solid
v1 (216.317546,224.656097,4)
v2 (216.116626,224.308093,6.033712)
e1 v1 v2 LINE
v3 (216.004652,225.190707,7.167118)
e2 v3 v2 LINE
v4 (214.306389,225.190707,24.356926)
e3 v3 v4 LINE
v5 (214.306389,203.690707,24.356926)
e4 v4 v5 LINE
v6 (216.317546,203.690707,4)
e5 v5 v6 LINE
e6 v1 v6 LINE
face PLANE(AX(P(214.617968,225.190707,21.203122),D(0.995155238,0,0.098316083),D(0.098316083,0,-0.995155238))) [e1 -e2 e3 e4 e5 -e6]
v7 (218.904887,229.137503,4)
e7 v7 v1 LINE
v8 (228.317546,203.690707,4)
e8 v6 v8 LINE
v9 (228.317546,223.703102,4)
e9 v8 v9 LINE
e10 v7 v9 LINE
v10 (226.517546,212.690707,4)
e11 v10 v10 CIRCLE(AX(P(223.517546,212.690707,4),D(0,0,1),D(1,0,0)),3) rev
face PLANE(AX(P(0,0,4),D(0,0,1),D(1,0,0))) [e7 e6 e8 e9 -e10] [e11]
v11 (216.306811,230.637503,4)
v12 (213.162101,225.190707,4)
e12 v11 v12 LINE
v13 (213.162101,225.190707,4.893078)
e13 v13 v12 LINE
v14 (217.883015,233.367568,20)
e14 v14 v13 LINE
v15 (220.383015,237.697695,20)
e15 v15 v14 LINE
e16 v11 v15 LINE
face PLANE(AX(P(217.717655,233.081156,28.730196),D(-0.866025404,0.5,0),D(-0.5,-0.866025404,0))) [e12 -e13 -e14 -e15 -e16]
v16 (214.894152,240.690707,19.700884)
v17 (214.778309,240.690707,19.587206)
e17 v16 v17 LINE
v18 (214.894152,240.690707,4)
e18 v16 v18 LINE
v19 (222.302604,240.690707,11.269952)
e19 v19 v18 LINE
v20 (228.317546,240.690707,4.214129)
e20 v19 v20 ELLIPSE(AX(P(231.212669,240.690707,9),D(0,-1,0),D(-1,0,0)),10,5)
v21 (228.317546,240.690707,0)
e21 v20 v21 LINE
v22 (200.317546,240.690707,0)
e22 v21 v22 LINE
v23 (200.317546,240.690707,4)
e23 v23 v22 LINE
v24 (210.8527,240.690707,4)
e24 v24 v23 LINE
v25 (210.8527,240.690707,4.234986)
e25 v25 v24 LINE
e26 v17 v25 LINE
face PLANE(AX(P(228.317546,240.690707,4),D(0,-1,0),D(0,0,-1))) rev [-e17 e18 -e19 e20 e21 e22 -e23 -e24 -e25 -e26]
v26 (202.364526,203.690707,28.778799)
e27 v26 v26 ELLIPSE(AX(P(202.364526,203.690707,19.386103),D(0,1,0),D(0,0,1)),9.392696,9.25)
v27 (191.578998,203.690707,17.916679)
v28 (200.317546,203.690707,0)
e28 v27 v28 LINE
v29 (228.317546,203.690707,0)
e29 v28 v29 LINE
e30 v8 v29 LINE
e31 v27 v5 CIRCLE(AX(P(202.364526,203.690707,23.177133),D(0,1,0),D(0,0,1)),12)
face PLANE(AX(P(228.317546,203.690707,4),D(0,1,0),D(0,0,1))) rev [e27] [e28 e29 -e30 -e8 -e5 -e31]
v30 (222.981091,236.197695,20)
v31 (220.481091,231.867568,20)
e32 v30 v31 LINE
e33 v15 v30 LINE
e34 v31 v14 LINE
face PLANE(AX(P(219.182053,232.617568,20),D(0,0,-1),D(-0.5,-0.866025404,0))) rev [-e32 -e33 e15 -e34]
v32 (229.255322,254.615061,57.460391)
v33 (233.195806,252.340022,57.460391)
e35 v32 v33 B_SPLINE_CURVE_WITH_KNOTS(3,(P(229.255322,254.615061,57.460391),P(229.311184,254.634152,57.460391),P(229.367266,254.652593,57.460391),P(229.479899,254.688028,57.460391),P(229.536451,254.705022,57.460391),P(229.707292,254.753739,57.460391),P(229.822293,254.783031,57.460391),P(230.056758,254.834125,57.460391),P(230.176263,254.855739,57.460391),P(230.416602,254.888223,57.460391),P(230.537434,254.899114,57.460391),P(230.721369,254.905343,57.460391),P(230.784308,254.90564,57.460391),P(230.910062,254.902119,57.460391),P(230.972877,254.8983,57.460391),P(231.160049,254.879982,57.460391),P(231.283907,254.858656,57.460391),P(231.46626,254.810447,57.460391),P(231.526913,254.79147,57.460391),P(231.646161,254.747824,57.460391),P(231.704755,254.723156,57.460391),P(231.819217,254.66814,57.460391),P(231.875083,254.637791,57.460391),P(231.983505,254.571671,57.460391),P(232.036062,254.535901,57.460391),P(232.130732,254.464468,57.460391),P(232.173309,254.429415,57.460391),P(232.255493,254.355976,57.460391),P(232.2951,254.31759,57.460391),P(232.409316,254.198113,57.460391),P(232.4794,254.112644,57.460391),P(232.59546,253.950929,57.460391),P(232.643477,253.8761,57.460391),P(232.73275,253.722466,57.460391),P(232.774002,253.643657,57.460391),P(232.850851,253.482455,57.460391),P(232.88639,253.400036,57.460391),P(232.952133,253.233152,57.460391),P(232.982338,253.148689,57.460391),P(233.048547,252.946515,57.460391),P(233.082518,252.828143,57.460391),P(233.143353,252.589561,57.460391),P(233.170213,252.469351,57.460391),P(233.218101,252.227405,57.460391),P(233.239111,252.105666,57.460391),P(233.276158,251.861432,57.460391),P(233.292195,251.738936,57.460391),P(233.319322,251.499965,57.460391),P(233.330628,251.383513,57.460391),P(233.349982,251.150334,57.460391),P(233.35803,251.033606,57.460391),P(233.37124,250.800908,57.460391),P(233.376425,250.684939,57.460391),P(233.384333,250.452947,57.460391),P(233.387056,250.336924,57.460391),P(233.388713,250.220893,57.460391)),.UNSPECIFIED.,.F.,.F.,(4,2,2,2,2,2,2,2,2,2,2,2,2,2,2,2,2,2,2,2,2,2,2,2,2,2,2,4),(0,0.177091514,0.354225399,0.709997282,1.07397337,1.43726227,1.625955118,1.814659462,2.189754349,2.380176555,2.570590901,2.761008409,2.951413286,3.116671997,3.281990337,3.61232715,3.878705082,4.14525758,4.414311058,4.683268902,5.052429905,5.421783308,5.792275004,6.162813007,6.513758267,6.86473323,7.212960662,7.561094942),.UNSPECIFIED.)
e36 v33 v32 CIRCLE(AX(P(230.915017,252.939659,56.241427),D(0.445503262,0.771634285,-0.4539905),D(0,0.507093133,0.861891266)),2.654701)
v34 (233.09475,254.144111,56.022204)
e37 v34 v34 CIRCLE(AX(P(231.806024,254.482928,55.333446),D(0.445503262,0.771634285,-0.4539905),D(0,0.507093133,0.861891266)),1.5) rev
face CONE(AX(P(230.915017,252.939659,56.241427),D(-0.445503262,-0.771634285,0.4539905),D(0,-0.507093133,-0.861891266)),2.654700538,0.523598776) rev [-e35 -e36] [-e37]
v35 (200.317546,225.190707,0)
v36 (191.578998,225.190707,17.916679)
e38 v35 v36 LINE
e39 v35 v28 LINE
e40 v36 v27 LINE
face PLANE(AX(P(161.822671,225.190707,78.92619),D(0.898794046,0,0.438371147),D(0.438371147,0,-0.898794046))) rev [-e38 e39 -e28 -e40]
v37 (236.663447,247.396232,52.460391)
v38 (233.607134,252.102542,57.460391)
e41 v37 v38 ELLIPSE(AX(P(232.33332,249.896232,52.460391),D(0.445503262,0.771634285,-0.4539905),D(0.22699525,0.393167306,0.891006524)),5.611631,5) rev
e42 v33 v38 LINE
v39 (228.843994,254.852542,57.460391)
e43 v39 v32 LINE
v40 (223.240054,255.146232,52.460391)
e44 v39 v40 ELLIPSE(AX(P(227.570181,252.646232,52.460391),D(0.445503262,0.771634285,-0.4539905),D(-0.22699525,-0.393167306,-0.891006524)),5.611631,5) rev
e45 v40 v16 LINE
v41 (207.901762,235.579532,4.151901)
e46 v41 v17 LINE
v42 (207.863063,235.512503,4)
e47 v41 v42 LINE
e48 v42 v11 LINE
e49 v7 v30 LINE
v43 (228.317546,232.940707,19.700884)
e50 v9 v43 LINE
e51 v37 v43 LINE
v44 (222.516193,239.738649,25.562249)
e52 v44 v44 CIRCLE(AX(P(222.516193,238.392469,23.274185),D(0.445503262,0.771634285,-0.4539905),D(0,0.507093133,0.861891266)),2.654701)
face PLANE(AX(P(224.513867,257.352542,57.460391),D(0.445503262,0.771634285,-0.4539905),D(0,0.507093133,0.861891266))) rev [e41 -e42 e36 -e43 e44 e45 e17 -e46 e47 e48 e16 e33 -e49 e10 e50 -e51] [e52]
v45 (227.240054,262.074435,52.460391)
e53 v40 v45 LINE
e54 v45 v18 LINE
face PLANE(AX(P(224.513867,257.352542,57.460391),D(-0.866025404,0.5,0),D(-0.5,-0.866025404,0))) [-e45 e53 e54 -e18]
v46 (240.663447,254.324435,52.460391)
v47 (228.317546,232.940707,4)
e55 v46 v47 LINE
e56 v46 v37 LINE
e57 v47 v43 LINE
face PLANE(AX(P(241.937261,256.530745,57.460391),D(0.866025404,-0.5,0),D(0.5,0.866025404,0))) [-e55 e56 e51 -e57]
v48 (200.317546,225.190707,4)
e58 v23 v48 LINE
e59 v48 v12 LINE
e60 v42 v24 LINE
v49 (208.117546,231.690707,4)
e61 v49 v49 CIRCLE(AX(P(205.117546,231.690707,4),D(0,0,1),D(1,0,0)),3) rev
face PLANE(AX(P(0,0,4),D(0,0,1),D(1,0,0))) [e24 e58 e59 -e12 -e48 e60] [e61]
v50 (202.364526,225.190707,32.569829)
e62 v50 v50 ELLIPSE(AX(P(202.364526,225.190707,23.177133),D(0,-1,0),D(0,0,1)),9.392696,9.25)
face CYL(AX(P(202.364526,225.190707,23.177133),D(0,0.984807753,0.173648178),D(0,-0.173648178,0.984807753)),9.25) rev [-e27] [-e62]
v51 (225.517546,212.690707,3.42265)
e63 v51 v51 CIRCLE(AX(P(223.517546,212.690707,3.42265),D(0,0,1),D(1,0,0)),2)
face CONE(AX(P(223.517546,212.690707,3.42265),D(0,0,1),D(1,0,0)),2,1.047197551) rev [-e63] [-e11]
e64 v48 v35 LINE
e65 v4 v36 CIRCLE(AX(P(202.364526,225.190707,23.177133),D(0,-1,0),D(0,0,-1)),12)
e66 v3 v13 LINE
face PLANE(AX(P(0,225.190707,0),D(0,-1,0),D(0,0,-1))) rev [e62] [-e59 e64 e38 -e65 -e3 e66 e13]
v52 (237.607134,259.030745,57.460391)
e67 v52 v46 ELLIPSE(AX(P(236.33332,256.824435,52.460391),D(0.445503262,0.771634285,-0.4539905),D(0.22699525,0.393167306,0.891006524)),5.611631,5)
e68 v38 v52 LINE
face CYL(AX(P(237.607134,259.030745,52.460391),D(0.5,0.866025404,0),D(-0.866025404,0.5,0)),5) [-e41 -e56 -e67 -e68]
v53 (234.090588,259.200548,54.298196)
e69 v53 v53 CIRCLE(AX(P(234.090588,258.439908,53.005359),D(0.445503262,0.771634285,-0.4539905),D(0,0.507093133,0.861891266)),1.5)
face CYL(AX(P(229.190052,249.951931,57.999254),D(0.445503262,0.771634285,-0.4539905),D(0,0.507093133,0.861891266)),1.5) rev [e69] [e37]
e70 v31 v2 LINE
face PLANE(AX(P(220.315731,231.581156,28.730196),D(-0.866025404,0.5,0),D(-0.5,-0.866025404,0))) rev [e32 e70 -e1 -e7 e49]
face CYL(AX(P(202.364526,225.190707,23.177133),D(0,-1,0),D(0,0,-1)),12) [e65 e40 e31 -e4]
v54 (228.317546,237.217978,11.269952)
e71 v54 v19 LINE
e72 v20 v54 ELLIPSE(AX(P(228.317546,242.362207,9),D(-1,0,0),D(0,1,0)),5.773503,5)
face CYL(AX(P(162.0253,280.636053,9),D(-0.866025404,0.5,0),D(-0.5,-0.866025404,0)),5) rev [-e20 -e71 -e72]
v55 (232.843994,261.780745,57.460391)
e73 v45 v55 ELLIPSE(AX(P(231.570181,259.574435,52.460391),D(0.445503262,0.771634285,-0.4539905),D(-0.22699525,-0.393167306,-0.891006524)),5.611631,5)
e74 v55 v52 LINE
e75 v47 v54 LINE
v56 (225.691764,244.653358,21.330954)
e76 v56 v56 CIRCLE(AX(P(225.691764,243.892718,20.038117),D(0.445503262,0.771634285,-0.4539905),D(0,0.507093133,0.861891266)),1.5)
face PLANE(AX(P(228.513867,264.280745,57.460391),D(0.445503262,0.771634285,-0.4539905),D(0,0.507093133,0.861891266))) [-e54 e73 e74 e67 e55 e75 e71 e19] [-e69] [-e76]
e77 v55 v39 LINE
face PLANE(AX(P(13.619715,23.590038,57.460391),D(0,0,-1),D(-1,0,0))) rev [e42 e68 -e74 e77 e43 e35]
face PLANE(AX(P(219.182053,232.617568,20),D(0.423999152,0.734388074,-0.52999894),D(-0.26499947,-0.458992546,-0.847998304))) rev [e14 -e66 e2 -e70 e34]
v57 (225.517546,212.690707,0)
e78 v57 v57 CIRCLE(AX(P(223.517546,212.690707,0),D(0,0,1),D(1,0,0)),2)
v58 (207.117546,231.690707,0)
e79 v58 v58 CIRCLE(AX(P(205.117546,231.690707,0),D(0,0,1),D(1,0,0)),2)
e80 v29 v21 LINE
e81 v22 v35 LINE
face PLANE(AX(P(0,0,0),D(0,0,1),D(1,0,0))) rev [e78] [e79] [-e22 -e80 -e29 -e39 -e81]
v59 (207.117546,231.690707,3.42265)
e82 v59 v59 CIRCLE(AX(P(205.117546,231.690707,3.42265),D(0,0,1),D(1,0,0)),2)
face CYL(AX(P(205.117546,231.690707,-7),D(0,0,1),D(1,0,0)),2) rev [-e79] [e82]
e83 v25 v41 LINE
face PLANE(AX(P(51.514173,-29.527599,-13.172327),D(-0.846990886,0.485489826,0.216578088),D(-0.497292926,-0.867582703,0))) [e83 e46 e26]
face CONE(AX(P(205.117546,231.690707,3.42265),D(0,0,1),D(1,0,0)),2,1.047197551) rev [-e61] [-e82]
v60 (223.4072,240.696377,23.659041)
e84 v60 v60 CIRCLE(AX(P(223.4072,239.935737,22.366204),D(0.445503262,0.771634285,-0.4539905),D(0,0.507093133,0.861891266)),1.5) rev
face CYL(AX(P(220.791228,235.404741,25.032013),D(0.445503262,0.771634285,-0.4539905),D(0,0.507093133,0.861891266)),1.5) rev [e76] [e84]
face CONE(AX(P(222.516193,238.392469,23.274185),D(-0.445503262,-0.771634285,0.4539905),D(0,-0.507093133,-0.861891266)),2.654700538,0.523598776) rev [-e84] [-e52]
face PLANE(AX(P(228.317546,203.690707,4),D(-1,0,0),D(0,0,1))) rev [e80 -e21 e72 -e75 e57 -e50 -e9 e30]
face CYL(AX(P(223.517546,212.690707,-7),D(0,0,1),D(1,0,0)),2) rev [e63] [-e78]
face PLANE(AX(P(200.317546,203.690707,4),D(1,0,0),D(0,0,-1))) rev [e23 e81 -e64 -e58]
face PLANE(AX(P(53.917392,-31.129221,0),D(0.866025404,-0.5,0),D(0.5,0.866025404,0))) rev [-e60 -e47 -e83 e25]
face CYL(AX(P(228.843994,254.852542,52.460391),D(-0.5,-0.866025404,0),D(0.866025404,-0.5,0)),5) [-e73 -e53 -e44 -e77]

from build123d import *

# Parameters (mm, degrees)
SKETCH1_W                       = 28
SKETCH1_H                       = 37
BOSS_EXTRUDE1_DEPTH             = 4
EXTRUDE_THIN1_DEPTH             = 60
BOSS_EXTRUDE2_DEPTH             = 18.5
BOSS_EXTRUDE2_DEPTH_BACK        = 3
SKETCH5_R                       = 12
BOSS_EXTRUDE4_REACH             = 356.551
BOSS_EXTRUDE4_DIRECTION_2_DEPTH = 19
CUT_EXTRUDE2_DEPTH              = 363.265046463
CHAMFER1_START                  = 52.77449686
CHAMFER1_DEPTH                  = 8.045724116
FILLET1_R                       = 5
SKETCH12_R                      = 2
CUT_EXTRUDE3_DEPTH              = 11
CHAMFER3_SIZE                   = 1
CHAMFER3_SIZE2                  = 0.577350269
RIB2_START                      = -1.5
RIB2_DEPTH                      = 3
SKETCH13_R                      = 1.5
CUT_EXTRUDE6_DEPTH              = 11
FILLET2_R                       = 5
CUT_REVOLVE_START               = 202.331523811
CUT_REVOLVE_3_OUTLINE_R         = 9.25
CUT_REVOLVE_3_DEPTH             = 25.093721499


with BuildPart() as part:
    # Sketch1 → Boss-Extrude1 (new body)
    with BuildSketch(Plane.XY):
        with Locations((214.317546036, 222.190706617)):
            Rectangle(SKETCH1_W, SKETCH1_H)
    extrude(amount=BOSS_EXTRUDE1_DEPTH)

    # Sketch4 → Extrude-Thin1 (add, along a direction that is not the sketch's normal)
    with BuildSketch(Plane.XY.offset(4)):
        Polygon((214.894152277, 240.690706617), (228.317546036, 232.940706617), (224.317546036, 226.012503387), (210.894152277, 233.762503387), align=None)
    extrude(amount=EXTRUDE_THIN1_DEPTH, dir=(0.22699524986977232, 0.3931673058512374, 0.8910065241883693))

    # Sketch5 → Boss-Extrude2 (add, two sides: drawn at the far end of the back side and taken through both)
    with BuildSketch(Plane(origin=(0, 222.190706617, 0), x_dir=(-1, 0, 0), z_dir=(0, -1, 0)).offset(-BOSS_EXTRUDE2_DEPTH_BACK)):
        with BuildLine():
            Line((-191.578997844, -17.916678927), (-200.317546036, 0))
            Line((-200.317546036, 0), (-216.317546036, 0))
            Line((-216.317546036, 0), (-216.317546036, -4))
            Line((-216.317546036, -4), (-214.306389256, -24.35692569))
            ThreePointArc((-214.306389256, -24.35692569), (-205.636142491, -11.631721126), (-191.578997844, -17.916678927))
        make_face()
        with Locations((-202.3645264, -23.177132689)):
            Circle(SKETCH5_R)
    extrude(amount=BOSS_EXTRUDE2_DEPTH + BOSS_EXTRUDE2_DEPTH_BACK)

    # Boss-Extrude4: up to this face of the body (flat: up to its plane)
    boss_extrude4_end = Plane(part.part.faces().sort_by_distance((228.317546036, 222.190706617, 2))[0])
    # Sketch7 → Boss-Extrude4 (add, up to the picked face)
    with BuildSketch(Plane(origin=(70.371874774, -40.629220844, 0), x_dir=(0, 0, -1), z_dir=(0.8660254037844386, -0.5, 0)), mode=Mode.PRIVATE) as boss_extrude4_sk1:
        Polygon((-4, 315.891342524), (-19.700884044, 315.891342524), (-4, 307.891342524), align=None)
    boss_extrude4_tool1 = split(extrude(boss_extrude4_sk1.sketch, amount=BOSS_EXTRUDE4_REACH, mode=Mode.PRIVATE), bisect_by=boss_extrude4_end, keep=Keep.BOTH, mode=Mode.PRIVATE)
    add(boss_extrude4_tool1.solids().sort_by(Axis((226.984213, 230.631306, 9.233628), (0.8660254037844386, -0.5, 0)))[0])

    # Sketch7 → Boss-Extrude4 direction 2 (add)
    with BuildSketch(Plane(origin=(70.371874774, -40.629220844, 0), x_dir=(0, 0, -1), z_dir=(0.8660254037844386, -0.5, 0))):
        Polygon((-4, 315.891342524), (-19.700884044, 315.891342524), (-4, 307.891342524), align=None)
    extrude(amount=-BOSS_EXTRUDE4_DIRECTION_2_DEPTH)

    # Sketch8 → Cut-Extrude2 (cut, through all)
    with BuildSketch(Plane(origin=(0, 0, 4), x_dir=(-1, 0, 0), z_dir=(0, 0, -1))):
        Polygon((-214.894152277, 240.690706617), (-210.852700393, 240.690706617), (-211.863063364, 242.440706617), align=None)
    extrude(amount=-CUT_EXTRUDE2_DEPTH, mode=Mode.SUBTRACT)

    # Chamfer1: read off the stored shape, not the designer's step
    # Chamfer1 outline → Chamfer1 (cut)
    with BuildSketch(Plane(origin=(0, 0, 0), x_dir=(0.5316074109578968, 0.7735134037427047, 0.3450660441785277), z_dir=(0.8469908857919558, -0.48548982616312697, -0.21657808771308096)).offset(CHAMFER1_START)):
        Polygon((307.114108085, -80.169957731), (294.178723025, -92.183926772), (299.729695769, -94.190354162), align=None)
    extrude(amount=CHAMFER1_DEPTH, mode=Mode.SUBTRACT)

    # Fillet1
    # the kernel refuses this fillet: 5 mm, written as the material it adds along each edge
    with BuildSketch(Plane(origin=(197.228839574, 250.889779662, 4), x_dir=(0.49999999999999944, 0.8660254037844389, 0), z_dir=(0.866025403784439, -0.4999999999999995, 0))) as fillet1_piece_1_section:
        with BuildLine():
            CenterArc((FILLET1_R * 1.63185168713, FILLET1_R), FILLET1_R, 153, 117)
            Line((FILLET1_R * 0.74084516294, FILLET1_R * 1.45399049974), (0, 0))
            Line((0, 0), (FILLET1_R * 1.63185168713, 0))
        make_face()
    fillet1_piece_1 = extrude(amount=56.296292178, mode=Mode.PRIVATE)
    fillet1_piece_1 = split(fillet1_piece_1, bisect_by=Plane(origin=(228.317546036, 250.889779662, 4), z_dir=(-1, 0, 0)), keep=Keep.TOP, mode=Mode.PRIVATE)
    fillet1_piece_1 = split(fillet1_piece_1, bisect_by=Plane(origin=(197.228839574, 240.690706617, 4), z_dir=(0, -1, 0)), keep=Keep.TOP, mode=Mode.PRIVATE)
    add(fillet1_piece_1)

    # Sketch12 → Cut-Extrude3 (cut)
    with BuildSketch(Plane.XY.offset(4)):
        with Locations((205.117546036, 231.690706617)):
            Circle(SKETCH12_R)
        with Locations((223.517546036, 212.690706617)):
            Circle(SKETCH12_R)
    extrude(amount=-CUT_EXTRUDE3_DEPTH, mode=Mode.SUBTRACT)

    # Chamfer3
    chamfer3_edges = [part.edges().sort_by_distance(p)[0] for p in [
        (203.117546036, 231.690706617, 4),
        (221.517546036, 212.690706617, 4),
    ]]
    chamfer3_side = [part.faces().sort_by_distance(p)[0] for p in [
        (208.956042358, 238.333607157, 4),
    ]]
    chamfer(chamfer3_edges, length=CHAMFER3_SIZE, length2=CHAMFER3_SIZE2, reference=chamfer3_side[0])

    # Rib2: read off the stored shape, not the designer's step
    # Rib2 outline → Rib2 (add)
    with BuildSketch(Plane(origin=(63.660177895, -36.754220844, 0), x_dir=(-0.49999999999999845, -0.8660254037844396, 0), z_dir=(-0.8660254037844396, 0.49999999999999845, 0)).offset(RIB2_START)):
        Polygon((-301.043749716, 4), (-311.043749716, 20), (-316.043749716, 20), (-307.891342524, 4), align=None)
    extrude(amount=RIB2_DEPTH)

    # Sketch13 → Cut-Extrude6 (cut)
    with BuildSketch(Plane(origin=(124.582886752, 215.783889609, -126.956302744), x_dir=(0.8952803155791154, -0.38397537070557247, 0.2259116447376676), z_dir=(0.44550326209418484, 0.7716342848848018, -0.45399049973954403))):
        with Locations(Location((122.316663554, -176.73795859, 0), (0, 0, 270))):
            Circle(SKETCH13_R)
        with Locations(Location((112.935440602, -140.94700085, 0), (0, 0, 270))):
            Circle(SKETCH13_R)
    extrude(amount=-CUT_EXTRUDE6_DEPTH, mode=Mode.SUBTRACT)

    # Fillet2
    fillet2_edges = [part.edges().sort_by_distance(p)[0] for p in [
        (239.937261028, 253.066643353, 57.460391451),
        (226.51386727, 260.816643353, 57.460391451),
    ]]
    fillet(fillet2_edges, radius=FILLET2_R)

    # Chamfer4: read off the stored shape, not the designer's step
    # Chamfer4: loft between two sections, ruled curve by curve
    chamfer4_from = [
        Edge.make_three_point_arc((233.094750309, 254.144111481, 56.022204084), (231.428373697, 255.374841148, 56.47881494), (230.517297529, 254.821743623, 54.644687533)),
        Edge.make_three_point_arc((230.517297529, 254.821743623, 54.644687533), (232.183674141, 253.591013956, 54.188076677), (233.094750309, 254.144111481, 56.022204084)),
    ]
    chamfer4_to = [
        Edge.make_three_point_arc((233.195805822, 252.340022177, 57.460391452), (230.246651896, 254.518167985, 58.268501508), (228.634228967, 253.539295786, 55.022462165)),
        Edge.make_three_point_arc((228.634228967, 253.539295786, 55.022462165), (231.583382893, 251.361149979, 54.214352108), (233.195805822, 252.340022177, 57.460391452)),
    ]
    chamfer4 = Solid(Shell([*[Face.make_surface_from_curves(chamfer4_from[k], chamfer4_to[k]) for k in range(2)], Face(Wire(chamfer4_from)), Face(Wire(chamfer4_to))]))
    add(chamfer4, mode=Mode.SUBTRACT)

    # Chamfer4 2: loft between two sections, ruled curve by curve
    chamfer4_2_from = [
        Edge.make_three_point_arc((223.407199674, 240.696376934, 23.659041313), (222.064279201, 240.511700292, 22.027336946), (223.407199674, 239.175097537, 21.073367514)),
        Edge.make_three_point_arc((223.407199674, 239.175097537, 21.073367514), (224.750120147, 239.359774179, 22.705071881), (223.407199674, 240.696376934, 23.659041313)),
    ]
    chamfer4_2_to = [
        Edge.make_three_point_arc((222.51619315, 239.738649078, 25.562248622), (220.139492014, 239.411808289, 22.674457648), (222.51619315, 237.046288254, 20.986122204)),
        Edge.make_three_point_arc((222.51619315, 237.046288254, 20.986122204), (224.892894286, 237.373129042, 23.873913178), (222.51619315, 239.738649078, 25.562248622)),
    ]
    chamfer4_2 = Solid(Shell([*[Face.make_surface_from_curves(chamfer4_2_from[k], chamfer4_2_to[k]) for k in range(2)], Face(Wire(chamfer4_2_from)), Face(Wire(chamfer4_2_to))]))
    add(chamfer4_2, mode=Mode.SUBTRACT)

    # 切除-旋转3: read off the stored shape, not the designer's step
    # 切除-旋转3 outline → 切除-旋转3 (cut)
    with BuildSketch(Plane(origin=(0, 0, 0), x_dir=(1, 0, 0), z_dir=(0, 0.984807753012207, 0.173648177666937)).offset(CUT_REVOLVE_START)):
        with Locations((202.3645264, 16.278935867)):
            Circle(CUT_REVOLVE_3_OUTLINE_R)
    extrude(amount=CUT_REVOLVE_3_DEPTH, mode=Mode.SUBTRACT)


solid = part.part
